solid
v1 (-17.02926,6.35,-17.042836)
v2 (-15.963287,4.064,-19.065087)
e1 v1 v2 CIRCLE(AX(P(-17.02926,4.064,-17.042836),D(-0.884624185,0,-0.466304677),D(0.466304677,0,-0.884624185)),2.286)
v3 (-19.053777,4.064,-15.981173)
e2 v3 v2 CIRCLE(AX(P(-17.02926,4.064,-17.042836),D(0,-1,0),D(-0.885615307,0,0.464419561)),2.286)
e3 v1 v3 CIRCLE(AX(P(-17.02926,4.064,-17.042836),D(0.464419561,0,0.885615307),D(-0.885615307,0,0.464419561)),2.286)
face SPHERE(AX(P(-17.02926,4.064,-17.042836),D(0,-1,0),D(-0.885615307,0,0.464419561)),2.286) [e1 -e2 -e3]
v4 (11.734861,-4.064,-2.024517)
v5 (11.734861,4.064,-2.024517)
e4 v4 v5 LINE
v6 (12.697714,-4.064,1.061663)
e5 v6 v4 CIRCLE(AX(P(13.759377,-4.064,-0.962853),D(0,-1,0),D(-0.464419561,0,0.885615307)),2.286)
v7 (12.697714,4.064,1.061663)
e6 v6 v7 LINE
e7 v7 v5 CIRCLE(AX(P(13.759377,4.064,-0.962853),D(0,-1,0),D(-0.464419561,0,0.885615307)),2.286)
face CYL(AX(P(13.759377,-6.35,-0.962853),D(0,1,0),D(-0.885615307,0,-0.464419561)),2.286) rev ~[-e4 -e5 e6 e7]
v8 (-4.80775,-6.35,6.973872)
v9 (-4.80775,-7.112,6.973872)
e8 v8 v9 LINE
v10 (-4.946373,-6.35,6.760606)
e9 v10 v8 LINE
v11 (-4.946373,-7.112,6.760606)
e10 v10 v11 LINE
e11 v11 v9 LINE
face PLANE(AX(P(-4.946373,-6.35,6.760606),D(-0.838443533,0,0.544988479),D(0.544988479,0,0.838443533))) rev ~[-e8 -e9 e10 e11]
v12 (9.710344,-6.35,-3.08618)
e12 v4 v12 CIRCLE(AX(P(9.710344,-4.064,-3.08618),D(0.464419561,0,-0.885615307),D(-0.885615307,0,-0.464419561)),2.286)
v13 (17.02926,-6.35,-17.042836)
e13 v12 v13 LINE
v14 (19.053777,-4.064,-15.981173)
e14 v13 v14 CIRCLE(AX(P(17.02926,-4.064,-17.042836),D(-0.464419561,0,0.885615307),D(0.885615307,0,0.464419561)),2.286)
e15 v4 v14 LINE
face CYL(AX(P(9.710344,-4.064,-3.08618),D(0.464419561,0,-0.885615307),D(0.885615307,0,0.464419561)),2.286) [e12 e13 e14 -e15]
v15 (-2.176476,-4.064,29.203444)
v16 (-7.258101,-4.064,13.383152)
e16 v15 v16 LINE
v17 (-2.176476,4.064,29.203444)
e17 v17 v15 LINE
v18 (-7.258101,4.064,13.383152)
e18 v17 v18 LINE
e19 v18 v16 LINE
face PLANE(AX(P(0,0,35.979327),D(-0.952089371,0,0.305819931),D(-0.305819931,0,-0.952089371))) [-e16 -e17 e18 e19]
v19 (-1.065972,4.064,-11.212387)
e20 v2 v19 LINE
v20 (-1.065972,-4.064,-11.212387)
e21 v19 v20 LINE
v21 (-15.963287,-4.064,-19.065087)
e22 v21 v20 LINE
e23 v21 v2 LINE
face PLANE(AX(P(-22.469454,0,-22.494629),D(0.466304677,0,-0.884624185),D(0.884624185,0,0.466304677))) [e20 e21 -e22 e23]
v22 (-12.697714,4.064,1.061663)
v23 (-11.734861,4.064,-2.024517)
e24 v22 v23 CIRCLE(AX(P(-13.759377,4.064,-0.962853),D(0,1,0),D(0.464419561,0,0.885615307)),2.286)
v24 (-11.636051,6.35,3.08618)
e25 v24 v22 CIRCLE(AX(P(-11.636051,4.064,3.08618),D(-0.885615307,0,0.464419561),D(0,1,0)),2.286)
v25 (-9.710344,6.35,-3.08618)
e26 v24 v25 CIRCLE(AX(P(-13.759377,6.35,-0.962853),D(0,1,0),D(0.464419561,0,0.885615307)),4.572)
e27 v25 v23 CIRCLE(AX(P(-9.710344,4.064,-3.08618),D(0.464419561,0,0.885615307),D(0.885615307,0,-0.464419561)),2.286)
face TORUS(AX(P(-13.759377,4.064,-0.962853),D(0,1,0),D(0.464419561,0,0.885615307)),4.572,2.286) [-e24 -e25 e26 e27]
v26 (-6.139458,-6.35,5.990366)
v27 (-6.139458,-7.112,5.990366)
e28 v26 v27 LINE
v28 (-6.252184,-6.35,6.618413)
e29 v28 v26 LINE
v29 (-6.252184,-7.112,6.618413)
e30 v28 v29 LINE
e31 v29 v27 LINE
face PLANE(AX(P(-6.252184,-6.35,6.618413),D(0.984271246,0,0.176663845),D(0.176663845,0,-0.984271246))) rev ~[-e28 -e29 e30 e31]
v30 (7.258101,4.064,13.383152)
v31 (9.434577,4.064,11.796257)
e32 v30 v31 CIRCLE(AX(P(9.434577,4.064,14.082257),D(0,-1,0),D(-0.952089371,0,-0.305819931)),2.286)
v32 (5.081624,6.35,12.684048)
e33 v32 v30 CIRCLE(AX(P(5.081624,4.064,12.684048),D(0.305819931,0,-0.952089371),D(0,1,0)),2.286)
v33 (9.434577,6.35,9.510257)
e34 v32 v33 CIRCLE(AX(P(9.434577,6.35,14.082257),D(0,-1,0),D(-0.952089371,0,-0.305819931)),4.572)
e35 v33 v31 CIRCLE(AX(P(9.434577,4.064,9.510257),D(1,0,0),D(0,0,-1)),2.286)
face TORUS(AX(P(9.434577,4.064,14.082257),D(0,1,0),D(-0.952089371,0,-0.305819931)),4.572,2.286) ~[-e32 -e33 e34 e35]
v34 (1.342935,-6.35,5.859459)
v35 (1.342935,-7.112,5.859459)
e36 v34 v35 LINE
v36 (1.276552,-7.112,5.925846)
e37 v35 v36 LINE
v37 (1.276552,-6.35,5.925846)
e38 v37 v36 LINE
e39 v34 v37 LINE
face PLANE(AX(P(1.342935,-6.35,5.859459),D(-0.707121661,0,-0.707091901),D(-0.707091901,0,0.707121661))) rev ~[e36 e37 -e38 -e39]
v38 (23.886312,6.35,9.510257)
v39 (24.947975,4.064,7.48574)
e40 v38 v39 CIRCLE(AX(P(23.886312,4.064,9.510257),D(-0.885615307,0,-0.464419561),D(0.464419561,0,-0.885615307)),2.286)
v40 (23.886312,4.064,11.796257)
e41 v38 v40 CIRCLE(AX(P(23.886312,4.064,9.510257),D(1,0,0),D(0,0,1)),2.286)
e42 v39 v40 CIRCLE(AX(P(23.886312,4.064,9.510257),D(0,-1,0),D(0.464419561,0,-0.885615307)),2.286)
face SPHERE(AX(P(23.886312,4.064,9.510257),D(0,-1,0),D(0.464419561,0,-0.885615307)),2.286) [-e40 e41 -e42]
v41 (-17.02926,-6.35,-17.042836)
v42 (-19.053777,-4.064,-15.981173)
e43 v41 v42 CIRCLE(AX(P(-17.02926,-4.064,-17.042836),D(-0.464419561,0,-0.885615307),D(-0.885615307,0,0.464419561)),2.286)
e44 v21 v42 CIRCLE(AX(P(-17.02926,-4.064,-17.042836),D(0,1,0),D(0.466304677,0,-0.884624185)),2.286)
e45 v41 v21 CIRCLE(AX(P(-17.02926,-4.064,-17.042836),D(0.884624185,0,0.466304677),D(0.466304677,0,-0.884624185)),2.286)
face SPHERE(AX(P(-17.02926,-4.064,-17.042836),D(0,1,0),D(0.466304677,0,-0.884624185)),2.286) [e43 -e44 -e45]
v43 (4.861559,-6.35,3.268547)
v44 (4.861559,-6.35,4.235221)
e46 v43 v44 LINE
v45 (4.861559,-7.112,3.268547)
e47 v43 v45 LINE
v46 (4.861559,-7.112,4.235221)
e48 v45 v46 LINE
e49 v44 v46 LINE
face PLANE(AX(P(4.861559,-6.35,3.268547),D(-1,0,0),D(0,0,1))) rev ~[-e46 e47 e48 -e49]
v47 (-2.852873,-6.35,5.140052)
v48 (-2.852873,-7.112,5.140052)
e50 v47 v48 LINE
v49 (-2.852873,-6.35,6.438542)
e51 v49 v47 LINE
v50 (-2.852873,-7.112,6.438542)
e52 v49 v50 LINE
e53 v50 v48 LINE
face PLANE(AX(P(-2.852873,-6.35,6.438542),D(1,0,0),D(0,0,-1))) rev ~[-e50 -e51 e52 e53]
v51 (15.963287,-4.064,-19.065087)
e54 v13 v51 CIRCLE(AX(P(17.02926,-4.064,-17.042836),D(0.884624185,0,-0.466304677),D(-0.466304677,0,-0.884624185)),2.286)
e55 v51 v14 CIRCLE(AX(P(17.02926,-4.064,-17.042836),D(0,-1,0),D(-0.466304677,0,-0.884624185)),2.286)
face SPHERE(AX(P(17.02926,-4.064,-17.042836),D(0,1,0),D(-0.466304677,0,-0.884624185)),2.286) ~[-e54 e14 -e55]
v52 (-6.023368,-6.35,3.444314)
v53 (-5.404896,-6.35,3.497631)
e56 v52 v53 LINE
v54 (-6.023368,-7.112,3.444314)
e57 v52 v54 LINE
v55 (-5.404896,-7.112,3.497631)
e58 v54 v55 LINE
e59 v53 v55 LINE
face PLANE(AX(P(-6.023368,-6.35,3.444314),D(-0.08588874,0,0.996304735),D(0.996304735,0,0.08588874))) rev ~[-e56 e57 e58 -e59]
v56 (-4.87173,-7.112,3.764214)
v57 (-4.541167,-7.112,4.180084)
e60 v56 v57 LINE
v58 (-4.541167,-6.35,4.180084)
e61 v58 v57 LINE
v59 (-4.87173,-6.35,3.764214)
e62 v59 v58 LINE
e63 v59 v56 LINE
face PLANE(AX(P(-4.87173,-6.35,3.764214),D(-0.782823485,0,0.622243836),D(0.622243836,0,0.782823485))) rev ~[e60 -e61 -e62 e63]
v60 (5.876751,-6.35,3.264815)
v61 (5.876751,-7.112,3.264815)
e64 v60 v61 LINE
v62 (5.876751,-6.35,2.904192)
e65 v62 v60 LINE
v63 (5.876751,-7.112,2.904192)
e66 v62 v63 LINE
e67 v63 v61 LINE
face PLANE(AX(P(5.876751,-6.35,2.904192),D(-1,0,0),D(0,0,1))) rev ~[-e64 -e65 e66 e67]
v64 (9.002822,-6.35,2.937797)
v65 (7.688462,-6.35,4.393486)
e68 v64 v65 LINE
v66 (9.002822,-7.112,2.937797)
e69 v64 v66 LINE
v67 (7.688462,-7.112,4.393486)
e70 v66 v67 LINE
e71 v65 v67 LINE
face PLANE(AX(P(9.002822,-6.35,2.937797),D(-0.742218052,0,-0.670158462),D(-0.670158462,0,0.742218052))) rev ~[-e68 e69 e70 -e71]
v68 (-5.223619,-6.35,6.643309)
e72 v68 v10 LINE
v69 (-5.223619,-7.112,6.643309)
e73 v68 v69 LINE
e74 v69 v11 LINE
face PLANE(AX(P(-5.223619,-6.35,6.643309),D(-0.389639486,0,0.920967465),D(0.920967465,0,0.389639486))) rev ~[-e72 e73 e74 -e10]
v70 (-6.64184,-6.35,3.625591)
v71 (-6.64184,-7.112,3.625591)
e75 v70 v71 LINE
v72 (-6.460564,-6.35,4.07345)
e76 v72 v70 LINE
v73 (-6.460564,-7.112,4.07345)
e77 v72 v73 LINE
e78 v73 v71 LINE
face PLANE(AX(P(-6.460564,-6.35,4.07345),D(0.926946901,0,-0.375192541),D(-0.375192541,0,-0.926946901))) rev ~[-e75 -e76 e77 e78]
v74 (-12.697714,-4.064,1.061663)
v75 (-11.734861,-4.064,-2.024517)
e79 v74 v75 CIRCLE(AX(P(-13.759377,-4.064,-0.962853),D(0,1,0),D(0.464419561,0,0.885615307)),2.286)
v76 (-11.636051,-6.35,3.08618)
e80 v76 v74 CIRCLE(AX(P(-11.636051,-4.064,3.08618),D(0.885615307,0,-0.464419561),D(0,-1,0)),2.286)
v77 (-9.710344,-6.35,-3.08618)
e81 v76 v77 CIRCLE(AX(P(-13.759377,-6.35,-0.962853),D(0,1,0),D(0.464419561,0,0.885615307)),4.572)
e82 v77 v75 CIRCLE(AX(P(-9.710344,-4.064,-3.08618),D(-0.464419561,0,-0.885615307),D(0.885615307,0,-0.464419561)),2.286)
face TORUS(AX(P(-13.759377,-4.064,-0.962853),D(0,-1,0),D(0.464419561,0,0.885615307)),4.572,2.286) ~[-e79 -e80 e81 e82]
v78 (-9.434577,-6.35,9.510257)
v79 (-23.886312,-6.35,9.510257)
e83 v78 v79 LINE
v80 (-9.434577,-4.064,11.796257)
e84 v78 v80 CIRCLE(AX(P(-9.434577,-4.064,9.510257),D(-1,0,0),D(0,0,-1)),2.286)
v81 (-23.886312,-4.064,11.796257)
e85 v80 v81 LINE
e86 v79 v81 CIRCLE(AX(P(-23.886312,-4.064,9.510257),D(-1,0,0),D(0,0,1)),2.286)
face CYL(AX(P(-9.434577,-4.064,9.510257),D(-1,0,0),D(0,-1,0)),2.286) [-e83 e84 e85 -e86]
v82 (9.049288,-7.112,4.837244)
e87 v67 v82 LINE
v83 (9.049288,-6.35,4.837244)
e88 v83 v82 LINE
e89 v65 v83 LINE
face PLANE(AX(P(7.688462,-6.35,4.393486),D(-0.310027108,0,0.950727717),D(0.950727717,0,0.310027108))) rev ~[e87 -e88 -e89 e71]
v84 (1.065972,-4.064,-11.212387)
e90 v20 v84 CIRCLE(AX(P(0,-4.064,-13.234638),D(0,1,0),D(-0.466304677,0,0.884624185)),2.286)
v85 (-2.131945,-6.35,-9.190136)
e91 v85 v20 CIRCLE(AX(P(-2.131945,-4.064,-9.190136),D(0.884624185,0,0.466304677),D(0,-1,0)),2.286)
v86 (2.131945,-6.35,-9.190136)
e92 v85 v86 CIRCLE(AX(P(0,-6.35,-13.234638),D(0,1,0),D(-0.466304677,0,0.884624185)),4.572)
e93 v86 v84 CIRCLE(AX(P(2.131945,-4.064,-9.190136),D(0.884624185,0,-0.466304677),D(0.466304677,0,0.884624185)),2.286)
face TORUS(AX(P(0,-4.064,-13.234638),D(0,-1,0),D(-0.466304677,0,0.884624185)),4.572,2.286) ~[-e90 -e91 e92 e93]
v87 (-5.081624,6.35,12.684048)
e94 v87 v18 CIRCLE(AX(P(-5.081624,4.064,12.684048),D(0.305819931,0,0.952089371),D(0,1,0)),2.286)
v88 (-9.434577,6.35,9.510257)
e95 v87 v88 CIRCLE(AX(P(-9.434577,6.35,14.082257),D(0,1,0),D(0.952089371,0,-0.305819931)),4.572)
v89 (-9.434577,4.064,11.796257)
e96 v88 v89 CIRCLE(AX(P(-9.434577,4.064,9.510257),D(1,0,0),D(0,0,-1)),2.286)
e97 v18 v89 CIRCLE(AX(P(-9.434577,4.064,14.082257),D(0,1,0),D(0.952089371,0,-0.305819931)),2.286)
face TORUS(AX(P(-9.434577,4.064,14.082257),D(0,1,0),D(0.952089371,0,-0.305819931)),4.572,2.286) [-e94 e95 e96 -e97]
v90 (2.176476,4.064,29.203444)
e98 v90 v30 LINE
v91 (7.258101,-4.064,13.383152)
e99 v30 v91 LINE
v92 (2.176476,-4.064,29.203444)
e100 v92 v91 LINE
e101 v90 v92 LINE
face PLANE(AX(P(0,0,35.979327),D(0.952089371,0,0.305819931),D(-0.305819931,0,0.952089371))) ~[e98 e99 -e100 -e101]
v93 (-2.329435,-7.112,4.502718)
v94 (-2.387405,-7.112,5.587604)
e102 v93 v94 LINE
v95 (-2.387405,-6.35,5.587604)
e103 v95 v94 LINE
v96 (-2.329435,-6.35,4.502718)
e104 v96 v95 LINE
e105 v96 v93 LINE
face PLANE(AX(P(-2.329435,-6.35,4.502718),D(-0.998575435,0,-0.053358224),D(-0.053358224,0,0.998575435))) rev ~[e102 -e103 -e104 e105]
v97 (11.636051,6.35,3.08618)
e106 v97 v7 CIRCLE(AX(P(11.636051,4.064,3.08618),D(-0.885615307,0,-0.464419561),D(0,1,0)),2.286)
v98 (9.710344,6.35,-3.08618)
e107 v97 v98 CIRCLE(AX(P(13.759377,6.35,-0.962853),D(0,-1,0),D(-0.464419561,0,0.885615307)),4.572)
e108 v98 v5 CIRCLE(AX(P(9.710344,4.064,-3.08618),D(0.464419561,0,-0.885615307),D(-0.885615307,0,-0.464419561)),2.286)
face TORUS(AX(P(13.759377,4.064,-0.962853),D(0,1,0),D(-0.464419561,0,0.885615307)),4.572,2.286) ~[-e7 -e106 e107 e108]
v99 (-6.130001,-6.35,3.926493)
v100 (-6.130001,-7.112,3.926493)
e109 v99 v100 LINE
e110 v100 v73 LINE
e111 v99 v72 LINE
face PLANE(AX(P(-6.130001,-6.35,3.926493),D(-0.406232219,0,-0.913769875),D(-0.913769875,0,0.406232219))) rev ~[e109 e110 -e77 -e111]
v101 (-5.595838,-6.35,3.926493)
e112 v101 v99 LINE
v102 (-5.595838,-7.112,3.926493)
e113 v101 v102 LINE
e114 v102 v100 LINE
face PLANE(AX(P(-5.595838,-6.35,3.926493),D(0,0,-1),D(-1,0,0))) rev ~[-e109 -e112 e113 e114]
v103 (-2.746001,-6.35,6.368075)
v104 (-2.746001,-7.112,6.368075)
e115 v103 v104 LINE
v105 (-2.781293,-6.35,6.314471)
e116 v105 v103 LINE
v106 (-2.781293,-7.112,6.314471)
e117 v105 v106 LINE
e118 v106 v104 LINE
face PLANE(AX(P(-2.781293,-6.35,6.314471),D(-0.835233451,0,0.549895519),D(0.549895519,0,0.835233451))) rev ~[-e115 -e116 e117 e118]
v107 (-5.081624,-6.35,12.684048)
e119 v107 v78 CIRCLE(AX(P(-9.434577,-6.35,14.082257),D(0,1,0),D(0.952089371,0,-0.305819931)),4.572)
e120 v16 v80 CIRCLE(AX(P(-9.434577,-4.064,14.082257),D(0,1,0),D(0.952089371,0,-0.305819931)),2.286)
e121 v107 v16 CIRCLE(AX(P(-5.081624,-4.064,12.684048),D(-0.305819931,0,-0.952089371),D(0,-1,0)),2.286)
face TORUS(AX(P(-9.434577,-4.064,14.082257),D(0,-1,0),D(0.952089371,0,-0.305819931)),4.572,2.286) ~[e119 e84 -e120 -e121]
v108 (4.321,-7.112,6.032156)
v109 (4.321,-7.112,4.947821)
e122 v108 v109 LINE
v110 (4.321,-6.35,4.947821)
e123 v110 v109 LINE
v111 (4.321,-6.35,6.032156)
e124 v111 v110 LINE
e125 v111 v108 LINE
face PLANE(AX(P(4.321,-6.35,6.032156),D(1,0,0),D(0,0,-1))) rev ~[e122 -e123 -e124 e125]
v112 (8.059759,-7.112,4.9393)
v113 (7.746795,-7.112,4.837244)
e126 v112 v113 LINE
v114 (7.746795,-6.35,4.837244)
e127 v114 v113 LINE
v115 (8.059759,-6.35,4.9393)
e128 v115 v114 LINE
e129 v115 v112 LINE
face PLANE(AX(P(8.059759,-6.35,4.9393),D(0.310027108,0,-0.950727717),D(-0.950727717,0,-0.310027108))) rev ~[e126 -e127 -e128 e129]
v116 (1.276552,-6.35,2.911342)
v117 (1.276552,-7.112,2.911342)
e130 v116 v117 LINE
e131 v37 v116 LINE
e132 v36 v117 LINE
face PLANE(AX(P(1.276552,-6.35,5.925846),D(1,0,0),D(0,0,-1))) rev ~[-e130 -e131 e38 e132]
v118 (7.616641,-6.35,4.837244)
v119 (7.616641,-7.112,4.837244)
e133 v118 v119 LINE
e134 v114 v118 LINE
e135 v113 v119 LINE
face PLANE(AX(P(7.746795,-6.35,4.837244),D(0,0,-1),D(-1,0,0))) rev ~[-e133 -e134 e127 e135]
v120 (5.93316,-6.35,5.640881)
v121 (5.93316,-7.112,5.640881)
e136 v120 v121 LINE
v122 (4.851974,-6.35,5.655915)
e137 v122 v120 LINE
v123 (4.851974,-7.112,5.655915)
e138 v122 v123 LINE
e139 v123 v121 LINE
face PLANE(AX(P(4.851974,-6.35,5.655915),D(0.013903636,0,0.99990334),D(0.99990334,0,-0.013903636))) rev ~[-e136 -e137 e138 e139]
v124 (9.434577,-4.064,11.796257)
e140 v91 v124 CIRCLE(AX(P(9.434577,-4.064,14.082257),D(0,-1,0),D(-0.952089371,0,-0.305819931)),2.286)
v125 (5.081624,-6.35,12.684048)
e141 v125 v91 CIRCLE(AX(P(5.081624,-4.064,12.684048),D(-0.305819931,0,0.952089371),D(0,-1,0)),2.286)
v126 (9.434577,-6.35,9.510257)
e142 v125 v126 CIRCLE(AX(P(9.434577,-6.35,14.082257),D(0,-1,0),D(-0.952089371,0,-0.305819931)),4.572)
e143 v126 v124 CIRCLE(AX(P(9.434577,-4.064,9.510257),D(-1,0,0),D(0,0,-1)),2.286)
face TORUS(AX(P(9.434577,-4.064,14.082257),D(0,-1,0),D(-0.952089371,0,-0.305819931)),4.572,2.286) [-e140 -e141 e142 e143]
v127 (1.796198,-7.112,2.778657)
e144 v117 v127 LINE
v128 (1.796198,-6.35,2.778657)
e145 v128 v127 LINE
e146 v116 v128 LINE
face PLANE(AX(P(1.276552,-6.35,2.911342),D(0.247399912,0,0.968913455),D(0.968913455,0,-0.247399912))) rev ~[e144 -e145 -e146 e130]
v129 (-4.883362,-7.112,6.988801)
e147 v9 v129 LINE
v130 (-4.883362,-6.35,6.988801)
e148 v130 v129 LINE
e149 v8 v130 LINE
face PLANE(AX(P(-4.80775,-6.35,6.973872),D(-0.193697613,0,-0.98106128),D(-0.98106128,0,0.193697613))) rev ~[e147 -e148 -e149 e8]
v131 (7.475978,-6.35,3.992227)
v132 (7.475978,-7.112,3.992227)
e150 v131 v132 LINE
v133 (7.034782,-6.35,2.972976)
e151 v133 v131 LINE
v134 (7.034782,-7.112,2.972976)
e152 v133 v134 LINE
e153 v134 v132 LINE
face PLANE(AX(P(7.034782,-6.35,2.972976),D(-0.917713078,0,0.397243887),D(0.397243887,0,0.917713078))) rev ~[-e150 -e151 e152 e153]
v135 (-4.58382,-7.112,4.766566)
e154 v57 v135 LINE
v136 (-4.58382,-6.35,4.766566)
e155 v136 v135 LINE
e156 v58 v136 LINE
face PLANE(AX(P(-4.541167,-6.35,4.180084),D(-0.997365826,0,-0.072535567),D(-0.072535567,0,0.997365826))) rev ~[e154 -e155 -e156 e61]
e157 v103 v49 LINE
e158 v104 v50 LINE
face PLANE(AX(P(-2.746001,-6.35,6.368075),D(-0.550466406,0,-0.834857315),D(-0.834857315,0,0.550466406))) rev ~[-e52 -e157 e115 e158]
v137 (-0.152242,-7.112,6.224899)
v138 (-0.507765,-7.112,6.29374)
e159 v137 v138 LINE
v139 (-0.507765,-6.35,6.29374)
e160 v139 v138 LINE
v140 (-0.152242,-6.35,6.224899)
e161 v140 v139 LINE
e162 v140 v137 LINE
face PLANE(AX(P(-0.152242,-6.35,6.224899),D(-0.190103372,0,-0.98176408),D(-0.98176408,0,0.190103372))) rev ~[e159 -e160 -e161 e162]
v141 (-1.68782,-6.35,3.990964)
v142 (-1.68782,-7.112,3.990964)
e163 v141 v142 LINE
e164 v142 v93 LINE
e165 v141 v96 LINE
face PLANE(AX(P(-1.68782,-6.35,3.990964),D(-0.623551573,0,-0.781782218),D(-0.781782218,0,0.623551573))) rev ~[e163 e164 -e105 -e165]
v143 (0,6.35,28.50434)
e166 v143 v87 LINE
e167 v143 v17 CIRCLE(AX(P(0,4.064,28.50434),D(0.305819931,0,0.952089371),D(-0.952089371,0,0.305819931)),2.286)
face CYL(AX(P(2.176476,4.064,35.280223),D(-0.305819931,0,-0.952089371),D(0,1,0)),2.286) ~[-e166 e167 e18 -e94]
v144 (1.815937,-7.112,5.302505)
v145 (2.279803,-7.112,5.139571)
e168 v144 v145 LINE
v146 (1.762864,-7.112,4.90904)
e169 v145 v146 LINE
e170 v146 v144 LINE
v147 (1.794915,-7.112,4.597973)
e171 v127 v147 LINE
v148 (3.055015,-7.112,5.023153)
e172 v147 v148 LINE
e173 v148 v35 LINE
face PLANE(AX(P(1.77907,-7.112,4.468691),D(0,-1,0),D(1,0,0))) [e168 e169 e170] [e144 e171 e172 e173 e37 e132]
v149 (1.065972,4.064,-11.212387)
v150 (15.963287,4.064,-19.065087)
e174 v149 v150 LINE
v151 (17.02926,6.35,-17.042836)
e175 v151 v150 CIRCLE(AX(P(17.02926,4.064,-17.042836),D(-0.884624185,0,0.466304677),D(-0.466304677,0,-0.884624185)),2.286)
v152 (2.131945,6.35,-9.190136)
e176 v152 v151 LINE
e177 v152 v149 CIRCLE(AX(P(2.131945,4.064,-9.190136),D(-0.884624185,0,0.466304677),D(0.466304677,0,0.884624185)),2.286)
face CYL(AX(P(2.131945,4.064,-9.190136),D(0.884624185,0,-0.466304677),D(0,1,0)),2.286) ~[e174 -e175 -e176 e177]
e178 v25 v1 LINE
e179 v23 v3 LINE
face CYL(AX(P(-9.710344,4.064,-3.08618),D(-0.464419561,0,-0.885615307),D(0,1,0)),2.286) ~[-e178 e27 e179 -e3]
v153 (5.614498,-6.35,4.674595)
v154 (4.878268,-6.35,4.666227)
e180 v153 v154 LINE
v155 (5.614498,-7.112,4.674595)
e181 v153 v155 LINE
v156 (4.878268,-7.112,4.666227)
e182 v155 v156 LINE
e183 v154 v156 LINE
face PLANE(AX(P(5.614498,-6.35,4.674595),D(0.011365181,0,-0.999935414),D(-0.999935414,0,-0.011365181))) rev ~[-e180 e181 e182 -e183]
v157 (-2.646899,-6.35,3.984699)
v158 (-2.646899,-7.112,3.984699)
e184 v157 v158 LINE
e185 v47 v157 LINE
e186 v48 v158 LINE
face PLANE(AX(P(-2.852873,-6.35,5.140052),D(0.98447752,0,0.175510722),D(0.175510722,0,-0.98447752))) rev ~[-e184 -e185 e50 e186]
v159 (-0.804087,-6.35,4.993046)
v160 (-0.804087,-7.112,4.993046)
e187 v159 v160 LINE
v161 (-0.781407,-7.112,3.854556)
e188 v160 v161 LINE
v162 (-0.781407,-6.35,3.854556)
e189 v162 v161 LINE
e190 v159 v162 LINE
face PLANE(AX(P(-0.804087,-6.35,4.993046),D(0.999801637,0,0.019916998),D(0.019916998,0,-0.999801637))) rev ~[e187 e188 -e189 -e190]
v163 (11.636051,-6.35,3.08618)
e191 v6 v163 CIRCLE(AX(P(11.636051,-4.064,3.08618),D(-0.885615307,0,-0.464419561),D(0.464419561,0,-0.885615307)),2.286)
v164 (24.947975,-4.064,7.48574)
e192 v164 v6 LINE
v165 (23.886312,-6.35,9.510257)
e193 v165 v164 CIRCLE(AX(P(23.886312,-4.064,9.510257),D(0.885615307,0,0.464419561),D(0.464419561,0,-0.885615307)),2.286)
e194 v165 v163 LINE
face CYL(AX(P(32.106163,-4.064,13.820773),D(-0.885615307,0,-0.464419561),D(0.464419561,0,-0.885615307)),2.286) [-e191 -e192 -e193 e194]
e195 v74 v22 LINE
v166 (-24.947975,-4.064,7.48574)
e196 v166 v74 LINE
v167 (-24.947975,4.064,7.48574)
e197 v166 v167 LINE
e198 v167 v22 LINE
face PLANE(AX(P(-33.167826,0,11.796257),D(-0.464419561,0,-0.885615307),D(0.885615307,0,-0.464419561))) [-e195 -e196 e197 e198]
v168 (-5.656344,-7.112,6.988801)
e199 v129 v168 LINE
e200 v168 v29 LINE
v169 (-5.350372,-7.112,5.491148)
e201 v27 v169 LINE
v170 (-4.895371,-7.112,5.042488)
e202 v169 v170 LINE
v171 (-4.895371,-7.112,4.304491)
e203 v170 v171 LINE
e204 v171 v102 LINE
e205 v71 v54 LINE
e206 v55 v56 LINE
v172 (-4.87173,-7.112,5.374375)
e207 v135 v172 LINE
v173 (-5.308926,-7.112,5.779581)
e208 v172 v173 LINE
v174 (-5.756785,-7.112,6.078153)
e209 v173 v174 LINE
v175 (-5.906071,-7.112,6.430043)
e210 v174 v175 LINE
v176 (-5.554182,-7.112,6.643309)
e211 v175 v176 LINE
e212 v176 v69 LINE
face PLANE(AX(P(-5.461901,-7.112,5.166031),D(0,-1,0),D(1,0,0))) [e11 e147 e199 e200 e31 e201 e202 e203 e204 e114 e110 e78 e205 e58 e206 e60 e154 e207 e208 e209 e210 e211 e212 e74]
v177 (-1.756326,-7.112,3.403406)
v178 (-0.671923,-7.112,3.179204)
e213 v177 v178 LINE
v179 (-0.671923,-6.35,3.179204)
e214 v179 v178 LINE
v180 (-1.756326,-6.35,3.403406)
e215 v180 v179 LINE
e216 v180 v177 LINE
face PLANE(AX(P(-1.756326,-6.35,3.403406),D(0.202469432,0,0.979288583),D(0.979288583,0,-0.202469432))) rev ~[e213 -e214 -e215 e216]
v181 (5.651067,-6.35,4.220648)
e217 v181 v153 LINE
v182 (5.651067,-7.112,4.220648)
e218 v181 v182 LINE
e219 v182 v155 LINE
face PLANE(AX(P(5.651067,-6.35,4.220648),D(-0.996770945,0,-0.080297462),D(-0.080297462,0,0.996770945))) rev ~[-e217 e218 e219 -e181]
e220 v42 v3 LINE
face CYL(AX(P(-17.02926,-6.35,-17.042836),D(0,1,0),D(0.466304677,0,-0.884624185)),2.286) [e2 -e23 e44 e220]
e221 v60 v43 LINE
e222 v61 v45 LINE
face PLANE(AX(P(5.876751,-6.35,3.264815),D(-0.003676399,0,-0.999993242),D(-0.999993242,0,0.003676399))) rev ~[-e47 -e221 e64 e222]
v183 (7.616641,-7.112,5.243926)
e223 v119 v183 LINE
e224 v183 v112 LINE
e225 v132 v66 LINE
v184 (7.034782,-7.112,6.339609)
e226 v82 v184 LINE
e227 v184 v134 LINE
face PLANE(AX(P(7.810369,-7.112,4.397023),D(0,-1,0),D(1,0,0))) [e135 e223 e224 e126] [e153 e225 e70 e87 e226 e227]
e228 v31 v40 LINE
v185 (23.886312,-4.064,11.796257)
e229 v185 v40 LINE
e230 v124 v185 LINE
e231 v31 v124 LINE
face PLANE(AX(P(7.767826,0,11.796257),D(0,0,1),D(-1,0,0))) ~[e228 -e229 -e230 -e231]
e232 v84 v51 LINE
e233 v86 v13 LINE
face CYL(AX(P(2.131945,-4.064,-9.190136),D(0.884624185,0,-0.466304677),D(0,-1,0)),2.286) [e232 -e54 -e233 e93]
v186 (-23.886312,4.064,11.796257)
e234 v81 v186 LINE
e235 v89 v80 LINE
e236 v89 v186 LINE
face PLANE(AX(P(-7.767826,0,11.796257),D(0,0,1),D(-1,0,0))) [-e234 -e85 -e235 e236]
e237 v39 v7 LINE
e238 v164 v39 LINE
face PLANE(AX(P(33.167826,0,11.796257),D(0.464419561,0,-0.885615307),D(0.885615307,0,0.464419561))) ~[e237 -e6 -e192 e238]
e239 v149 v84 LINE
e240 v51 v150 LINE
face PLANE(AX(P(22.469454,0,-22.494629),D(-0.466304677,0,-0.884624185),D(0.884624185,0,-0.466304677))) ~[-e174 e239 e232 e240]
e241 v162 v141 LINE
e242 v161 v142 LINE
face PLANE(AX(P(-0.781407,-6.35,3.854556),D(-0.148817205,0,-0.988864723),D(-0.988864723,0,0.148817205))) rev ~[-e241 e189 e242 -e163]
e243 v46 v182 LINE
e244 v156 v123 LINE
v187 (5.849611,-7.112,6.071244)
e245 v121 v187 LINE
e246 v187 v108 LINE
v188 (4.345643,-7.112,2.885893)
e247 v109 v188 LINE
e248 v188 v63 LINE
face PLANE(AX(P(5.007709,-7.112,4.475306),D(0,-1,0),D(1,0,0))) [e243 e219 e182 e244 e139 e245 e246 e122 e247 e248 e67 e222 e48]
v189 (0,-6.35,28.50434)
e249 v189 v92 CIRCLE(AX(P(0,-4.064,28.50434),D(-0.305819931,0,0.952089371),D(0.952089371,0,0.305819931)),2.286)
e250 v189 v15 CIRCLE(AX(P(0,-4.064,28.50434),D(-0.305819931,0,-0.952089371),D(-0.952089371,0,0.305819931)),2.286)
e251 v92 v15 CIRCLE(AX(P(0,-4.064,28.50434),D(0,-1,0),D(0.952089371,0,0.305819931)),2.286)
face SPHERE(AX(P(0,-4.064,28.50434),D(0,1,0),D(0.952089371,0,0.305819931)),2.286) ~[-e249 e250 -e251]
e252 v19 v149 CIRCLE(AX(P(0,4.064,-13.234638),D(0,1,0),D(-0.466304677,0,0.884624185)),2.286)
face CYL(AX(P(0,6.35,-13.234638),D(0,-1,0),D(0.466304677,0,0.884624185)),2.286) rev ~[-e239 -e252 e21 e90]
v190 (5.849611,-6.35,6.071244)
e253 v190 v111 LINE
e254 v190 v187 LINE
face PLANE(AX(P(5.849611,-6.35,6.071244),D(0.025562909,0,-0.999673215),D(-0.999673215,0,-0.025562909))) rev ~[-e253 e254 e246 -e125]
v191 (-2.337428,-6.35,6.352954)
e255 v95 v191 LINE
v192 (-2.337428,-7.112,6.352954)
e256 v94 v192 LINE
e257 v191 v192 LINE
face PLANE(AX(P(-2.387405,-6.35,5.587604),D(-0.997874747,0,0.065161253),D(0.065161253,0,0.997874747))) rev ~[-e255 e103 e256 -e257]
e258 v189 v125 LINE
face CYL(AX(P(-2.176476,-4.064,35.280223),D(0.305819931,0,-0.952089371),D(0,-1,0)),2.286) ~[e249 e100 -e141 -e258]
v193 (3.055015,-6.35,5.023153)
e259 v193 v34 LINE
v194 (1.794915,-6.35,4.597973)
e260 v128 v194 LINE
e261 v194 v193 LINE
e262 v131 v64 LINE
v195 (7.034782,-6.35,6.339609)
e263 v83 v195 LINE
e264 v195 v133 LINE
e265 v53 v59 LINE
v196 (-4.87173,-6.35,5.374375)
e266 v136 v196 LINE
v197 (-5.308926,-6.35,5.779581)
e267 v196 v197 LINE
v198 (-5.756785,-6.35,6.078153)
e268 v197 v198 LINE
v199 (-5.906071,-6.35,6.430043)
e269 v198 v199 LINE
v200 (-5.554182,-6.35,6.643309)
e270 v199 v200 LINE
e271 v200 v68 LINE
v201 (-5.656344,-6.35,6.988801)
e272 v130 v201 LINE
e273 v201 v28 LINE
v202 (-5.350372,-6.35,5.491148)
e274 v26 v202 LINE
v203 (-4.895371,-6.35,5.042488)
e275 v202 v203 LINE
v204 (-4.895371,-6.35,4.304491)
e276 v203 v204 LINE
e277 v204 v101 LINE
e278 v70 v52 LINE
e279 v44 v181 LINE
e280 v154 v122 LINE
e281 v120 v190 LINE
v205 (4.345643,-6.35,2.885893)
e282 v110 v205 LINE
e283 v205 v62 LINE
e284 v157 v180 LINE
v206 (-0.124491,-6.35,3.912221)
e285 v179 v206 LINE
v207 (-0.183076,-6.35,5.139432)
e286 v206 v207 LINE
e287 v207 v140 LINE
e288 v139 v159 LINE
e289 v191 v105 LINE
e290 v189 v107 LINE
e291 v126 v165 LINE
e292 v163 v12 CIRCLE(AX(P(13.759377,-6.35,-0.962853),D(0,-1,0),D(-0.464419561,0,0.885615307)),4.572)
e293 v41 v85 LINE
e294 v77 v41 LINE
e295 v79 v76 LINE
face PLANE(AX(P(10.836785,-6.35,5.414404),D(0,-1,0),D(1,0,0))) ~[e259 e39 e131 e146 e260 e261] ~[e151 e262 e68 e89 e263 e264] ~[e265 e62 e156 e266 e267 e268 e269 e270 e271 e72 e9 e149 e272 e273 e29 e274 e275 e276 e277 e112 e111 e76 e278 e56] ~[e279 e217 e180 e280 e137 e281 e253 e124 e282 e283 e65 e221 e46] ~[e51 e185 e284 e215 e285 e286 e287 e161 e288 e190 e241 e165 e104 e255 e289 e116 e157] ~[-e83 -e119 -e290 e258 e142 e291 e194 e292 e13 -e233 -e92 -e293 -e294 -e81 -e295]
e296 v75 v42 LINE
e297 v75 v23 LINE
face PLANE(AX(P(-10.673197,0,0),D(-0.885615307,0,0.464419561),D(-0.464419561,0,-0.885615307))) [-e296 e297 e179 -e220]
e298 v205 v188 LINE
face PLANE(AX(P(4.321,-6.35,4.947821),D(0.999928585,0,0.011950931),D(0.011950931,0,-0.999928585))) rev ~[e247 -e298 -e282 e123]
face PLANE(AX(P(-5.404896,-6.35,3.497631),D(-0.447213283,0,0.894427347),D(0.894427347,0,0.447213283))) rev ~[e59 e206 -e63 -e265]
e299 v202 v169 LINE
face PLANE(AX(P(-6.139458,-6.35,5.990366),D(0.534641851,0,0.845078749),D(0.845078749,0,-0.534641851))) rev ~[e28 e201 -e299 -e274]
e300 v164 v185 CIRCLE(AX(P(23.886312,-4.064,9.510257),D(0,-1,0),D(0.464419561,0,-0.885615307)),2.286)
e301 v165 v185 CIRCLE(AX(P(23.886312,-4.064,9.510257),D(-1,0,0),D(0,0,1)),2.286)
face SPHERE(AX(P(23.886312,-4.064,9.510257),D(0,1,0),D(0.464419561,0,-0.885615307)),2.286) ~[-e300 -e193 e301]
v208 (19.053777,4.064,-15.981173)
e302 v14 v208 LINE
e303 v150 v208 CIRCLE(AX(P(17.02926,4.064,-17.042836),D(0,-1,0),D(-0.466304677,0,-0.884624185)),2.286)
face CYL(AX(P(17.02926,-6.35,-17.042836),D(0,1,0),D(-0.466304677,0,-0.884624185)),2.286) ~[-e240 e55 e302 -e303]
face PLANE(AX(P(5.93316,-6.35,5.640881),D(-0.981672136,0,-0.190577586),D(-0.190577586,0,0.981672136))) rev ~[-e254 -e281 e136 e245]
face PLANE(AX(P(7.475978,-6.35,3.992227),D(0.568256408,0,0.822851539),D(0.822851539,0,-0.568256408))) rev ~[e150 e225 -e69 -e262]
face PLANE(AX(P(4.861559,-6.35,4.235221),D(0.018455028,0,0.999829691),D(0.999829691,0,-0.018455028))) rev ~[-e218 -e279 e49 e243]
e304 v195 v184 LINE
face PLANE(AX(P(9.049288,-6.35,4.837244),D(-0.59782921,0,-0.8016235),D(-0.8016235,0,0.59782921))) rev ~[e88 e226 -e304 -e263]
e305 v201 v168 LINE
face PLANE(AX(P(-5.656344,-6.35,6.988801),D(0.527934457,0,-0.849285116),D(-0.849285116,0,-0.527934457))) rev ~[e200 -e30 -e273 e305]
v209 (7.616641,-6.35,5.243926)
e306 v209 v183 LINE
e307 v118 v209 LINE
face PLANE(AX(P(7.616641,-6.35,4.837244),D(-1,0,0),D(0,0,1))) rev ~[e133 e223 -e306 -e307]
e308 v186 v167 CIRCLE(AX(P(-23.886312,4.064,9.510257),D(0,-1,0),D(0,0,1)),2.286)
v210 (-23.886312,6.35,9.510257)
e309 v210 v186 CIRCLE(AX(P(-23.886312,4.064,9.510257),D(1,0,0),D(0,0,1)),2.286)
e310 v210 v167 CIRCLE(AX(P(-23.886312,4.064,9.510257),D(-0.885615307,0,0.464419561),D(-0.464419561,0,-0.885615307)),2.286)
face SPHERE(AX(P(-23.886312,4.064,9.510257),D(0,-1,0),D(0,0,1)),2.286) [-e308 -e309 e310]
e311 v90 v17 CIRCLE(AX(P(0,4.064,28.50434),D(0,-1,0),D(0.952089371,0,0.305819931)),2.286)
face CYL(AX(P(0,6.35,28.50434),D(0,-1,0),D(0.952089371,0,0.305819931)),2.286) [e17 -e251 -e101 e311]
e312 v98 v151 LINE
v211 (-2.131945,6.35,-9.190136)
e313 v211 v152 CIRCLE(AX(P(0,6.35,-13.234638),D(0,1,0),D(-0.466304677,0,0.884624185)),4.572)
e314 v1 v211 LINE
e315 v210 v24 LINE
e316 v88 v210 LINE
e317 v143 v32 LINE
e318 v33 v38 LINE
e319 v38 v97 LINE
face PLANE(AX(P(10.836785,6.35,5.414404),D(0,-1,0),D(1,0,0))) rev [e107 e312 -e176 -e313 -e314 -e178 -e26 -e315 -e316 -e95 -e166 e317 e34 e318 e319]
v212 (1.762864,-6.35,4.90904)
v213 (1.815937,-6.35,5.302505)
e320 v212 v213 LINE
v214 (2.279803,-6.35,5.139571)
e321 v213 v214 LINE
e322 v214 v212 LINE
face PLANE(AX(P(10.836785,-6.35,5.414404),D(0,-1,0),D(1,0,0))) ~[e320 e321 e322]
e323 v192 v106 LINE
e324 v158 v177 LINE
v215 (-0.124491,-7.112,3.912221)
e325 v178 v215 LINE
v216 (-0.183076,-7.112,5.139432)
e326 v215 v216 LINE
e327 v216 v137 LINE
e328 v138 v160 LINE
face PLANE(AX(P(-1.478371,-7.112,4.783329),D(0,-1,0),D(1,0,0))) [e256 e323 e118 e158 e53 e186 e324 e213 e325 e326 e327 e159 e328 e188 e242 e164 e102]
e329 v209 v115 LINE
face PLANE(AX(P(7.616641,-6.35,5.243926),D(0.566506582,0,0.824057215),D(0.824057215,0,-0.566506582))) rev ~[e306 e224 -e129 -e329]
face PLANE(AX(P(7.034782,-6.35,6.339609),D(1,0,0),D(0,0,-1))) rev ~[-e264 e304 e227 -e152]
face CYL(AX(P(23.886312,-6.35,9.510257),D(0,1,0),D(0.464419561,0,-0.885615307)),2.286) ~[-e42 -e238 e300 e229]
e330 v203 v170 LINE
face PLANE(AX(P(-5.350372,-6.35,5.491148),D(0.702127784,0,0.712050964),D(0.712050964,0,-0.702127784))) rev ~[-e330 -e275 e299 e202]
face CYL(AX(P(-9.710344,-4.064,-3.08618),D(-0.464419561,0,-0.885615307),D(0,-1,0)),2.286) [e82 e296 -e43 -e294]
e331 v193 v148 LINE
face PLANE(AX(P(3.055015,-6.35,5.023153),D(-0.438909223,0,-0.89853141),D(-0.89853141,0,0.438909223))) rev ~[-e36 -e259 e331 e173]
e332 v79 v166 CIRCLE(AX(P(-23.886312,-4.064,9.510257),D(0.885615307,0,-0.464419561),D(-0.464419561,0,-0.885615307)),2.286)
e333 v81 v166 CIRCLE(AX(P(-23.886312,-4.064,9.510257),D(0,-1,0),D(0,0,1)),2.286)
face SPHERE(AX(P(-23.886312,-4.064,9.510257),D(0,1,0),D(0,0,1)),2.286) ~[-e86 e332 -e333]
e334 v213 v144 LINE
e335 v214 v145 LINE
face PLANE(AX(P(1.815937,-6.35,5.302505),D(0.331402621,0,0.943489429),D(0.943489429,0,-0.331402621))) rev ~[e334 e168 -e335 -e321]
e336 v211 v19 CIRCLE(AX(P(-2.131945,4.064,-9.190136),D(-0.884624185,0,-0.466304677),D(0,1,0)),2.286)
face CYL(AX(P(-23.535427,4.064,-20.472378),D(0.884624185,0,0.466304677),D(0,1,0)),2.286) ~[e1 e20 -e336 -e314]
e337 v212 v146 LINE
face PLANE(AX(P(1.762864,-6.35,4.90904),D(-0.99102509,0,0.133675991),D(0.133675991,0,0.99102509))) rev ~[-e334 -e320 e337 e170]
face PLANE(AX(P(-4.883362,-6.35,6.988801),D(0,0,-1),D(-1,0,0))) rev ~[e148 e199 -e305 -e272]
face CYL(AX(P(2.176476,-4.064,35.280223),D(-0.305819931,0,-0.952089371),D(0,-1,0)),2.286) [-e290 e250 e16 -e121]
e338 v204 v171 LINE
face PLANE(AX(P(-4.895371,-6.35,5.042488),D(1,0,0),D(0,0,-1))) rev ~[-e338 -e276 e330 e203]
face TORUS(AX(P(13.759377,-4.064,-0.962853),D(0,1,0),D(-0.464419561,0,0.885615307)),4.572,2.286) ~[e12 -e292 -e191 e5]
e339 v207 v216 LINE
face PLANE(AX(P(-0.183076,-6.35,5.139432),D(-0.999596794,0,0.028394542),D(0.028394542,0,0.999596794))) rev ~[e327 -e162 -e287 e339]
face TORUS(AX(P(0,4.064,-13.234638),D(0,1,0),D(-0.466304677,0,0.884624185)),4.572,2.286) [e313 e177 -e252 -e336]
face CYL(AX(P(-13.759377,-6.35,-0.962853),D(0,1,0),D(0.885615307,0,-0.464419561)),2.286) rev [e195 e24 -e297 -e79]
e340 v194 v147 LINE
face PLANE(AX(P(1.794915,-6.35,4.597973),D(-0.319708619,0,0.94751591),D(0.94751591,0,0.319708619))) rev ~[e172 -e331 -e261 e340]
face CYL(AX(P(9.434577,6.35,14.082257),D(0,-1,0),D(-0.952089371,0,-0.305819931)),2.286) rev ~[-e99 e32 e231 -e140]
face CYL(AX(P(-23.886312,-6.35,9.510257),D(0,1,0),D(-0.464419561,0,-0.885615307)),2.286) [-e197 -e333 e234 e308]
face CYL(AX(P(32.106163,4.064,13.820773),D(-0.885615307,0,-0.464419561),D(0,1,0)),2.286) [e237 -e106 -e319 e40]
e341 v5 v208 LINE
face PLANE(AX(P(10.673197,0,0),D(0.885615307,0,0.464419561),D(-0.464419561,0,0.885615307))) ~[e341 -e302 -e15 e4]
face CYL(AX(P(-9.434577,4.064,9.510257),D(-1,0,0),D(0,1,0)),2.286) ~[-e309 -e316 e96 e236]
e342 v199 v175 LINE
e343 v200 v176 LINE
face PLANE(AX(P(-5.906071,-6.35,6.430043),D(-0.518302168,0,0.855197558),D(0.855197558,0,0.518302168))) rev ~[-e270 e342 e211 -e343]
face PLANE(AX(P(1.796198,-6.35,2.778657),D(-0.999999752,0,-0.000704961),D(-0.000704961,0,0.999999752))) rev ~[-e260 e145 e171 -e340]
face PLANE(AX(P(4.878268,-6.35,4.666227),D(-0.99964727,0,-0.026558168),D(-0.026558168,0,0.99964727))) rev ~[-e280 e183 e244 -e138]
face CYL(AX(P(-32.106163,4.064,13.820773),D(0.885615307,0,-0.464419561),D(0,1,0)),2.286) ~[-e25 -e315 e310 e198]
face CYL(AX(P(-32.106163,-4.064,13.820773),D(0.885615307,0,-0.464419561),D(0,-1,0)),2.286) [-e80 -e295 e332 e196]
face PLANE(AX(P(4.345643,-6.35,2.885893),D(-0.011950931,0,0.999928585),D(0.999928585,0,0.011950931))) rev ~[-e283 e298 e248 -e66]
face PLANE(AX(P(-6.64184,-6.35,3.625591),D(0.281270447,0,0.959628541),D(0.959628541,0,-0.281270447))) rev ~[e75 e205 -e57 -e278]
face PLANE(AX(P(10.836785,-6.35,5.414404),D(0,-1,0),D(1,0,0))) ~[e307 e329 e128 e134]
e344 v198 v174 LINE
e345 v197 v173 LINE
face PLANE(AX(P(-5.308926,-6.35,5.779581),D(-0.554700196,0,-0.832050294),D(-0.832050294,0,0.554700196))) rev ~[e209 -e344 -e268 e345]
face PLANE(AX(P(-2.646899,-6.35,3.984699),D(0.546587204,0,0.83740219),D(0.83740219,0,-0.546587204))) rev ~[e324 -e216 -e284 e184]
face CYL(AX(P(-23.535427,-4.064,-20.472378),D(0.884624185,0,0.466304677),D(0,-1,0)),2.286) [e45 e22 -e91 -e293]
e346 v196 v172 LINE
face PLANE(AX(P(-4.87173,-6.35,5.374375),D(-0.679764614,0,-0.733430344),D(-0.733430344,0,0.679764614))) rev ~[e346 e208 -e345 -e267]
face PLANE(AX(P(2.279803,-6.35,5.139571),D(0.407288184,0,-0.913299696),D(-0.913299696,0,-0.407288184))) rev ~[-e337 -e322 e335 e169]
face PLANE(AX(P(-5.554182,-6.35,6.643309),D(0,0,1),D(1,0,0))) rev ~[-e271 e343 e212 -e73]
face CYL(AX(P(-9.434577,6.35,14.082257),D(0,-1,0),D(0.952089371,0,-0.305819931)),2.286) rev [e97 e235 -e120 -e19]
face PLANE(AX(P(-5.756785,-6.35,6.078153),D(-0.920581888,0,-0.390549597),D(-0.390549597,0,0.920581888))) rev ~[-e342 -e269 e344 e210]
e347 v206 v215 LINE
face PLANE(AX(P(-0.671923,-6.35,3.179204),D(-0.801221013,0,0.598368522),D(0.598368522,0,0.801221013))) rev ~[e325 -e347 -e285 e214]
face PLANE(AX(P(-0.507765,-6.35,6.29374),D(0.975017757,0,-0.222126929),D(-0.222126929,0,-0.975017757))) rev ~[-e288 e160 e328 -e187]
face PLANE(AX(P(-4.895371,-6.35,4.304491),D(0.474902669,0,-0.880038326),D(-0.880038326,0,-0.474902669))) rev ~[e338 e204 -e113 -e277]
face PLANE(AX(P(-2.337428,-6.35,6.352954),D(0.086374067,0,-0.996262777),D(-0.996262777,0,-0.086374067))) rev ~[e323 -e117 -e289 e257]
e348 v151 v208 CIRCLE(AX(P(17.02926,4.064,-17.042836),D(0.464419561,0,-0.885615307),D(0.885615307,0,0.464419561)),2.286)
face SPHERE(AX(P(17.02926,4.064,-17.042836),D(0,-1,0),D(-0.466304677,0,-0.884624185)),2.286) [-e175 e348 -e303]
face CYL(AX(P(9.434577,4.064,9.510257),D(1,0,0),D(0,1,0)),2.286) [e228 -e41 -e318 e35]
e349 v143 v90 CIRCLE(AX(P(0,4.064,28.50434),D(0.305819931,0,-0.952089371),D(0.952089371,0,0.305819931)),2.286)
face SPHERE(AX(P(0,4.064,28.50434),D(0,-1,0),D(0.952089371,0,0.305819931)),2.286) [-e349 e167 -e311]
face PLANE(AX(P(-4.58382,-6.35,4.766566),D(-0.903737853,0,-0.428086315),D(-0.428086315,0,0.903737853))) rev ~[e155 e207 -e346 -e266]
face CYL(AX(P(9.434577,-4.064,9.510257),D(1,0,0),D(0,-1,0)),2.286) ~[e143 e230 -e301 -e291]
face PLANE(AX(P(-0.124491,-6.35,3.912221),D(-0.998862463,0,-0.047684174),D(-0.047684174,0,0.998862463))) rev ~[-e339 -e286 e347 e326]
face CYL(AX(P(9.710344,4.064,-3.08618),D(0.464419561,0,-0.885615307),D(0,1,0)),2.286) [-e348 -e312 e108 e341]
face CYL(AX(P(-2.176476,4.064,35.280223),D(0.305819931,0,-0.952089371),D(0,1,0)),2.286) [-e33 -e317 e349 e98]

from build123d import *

# Parameters (mm, degrees)
F2_DEPTH = 6.35
F4_F1_R  = 2.286
F4_F2_R  = 2.286
F9_DEPTH = 0.762
F7_DEPTH = 0.762


with BuildPart() as f2:
    # F1 (on face) → F2 (new body, symmetric)
    with BuildSketch(Plane.XZ):
        Polygon((-22.4694542891, -22.4946287922), (0, -10.6504899906), (0, 35.9793268616), (-7.7678262384, 11.7962568429), (-33.1678262384, 11.7962568429), (-10.6731974462, 0), align=None)
    extrude(amount=F2_DEPTH, both=True)

    # F3: F2 across plane


with BuildPart() as f2_1:
    add(f2.part)
    add(f2.part.mirror(Plane.YZ))

    # F4: fillet of radius 2.286 on 26 edges, made by hand

    # F4_f1
    f4_f1_edges = [f2_1.edges().sort_by_distance(p)[0] for p in [
        (7.7678262384, 0, 11.7962568429),
        (10.6731974462, 0, 0),
        (0, 0, -10.6504899906),
        (-10.6731974462, 0, 0),
        (-7.7678262384, 0, 11.7962568429),
    ]]
    fillet(f4_f1_edges, radius=F4_F1_R)

    # F4_f2
    f4_f2_edges = [f2_1.edges().sort_by_distance(p)[0] for p in [
        (-11.7677133906, -6.35, -16.8535080516),
        (11.7677133906, -6.35, -16.8535080516),
        (17.1021574256, -6.35, -12.2595726917),
        (22.932770138, -6.35, 6.4289599794),
        (21.3012015954, -6.35, 11.7962568429),
        (3.6290503253, -6.35, 24.6812396715),
        (-3.6290503253, -6.35, 24.6812396715),
        (-21.3012015954, -6.35, 11.7962568429),
        (-22.932770138, -6.35, 6.4289599794),
        (-17.1021574256, -6.35, -12.2595726917),
        (0, 0, 35.9793268616),
        (3.6290503253, 6.35, 24.6812396715),
        (21.3012015954, 6.35, 11.7962568429),
        (33.1678262384, 0, 11.7962568429),
        (17.1021574256, 6.35, -12.2595726917),
        (22.4694542891, 0, -22.4946287922),
        (-11.7677133906, 6.35, -16.8535080516),
        (-22.4694542891, 0, -22.4946287922),
        (-22.932770138, 6.35, 6.4289599794),
        (-33.1678262384, 0, 11.7962568429),
        (-21.3012015954, 6.35, 11.7962568429),
        (-8.0877949674, 6.35, 12.2351038213),
        (-11.5771185545, 6.35, -0.2820132537),
        (0, 6.35, -10.948638197),
        (11.5771185545, 6.35, -0.2820132537),
        (8.0877949674, 6.35, 12.2351038213),
        (-11.5771185545, -6.35, -0.2820132537),
        (-8.0877949674, -6.35, 12.2351038213),
        (8.0877949674, -6.35, 12.2351038213),
        (11.5771185545, -6.35, -0.2820132537),
        (0, -6.35, -10.948638197),
    ]]
    fillet(f4_f2_edges, radius=F4_F2_R)

    # F8 (on face) → F9 (join)
    with BuildSketch(Plane.XZ.offset(6.35)):
        Polygon((-4.8077497631, 6.9738719612), (-4.8833619803, 6.9888005964), (-5.6563438848, 6.9888005964), (-6.2521840446, 6.6184131429), (-6.1394576915, 5.9903655201), (-5.3503718227, 5.4911477491), (-4.8953713849, 5.0424882211), (-4.8953713849, 4.3044914491), (-5.5958377197, 3.9264927618), (-6.1300005764, 3.9264927618), (-6.4605637453, 4.0734503418), (-6.6418400966, 3.6255908199), (-6.0233678669, 3.4443144687), (-5.4048956372, 3.4976312891), (-4.8717297614, 3.7642139941), (-4.5411670581, 4.180083517), (-4.583820235, 4.7665657476), (-4.8717297614, 5.3743747994), (-5.3089256398, 5.7795806788), (-5.7567846961, 6.078153383), (-5.9060710482, 6.4300429076), (-5.5541819893, 6.6433092579), (-5.223619286, 6.6433092579), (-4.9463729374, 6.7606056109), align=None)
    extrude(amount=F9_DEPTH)

    # F6 (on face) → F7 (join)
    with BuildSketch(Plane.XZ.offset(6.35)):
        Polygon((-2.7460011188, 6.3680754974), (-2.852873411, 6.4385421574), (-2.852873411, 5.140052177), (-2.6468993165, 3.9846990258), (-1.7563264119, 3.4034063574), (-0.6719225785, 3.1792041846), (-0.124490587, 3.912220709), (-0.1830757828, 5.1394319162), (-0.1522420207, 6.2248986214), (-0.5077649839, 6.2937401235), (-0.8040870307, 4.9930457026), (-0.7814072305, 3.8545557763), (-1.6878197202, 3.9909644984), (-2.3294347338, 4.5027183369), (-2.3874049075, 5.5876043625), (-2.337427577, 6.3529536128), (-2.7812926564, 6.314471364), align=None)
        Polygon((1.3429354876, 5.8594592847), (1.2765517458, 5.9258458205), (1.2765517458, 2.9113423079), (1.7961976118, 2.7786572464), (1.7949150642, 4.5979730785), (3.0550148804, 5.0231530331), align=None)
        Polygon((2.2798031569, 5.1395706832), (1.7628639471, 4.9090404063), (1.8159369938, 5.3025046363), align=None, mode=Mode.SUBTRACT)
        Polygon((5.8496114798, 6.0712443665), (4.3209996074, 6.0321558267), (4.3209996074, 4.947821144), (4.3456433341, 2.8858925216), (5.8767511191, 2.904191992), (5.8767511191, 3.2648150809), (4.8615592532, 3.2685473561), (4.8615592532, 4.235221073), (5.6510670111, 4.220648203), (5.6144981645, 4.6745948493), (4.8782676458, 4.666226916), (4.8519740812, 5.6559145451), (5.933160428, 5.6408806704), align=None)
        Polygon((7.0347818546, 6.3396086916), (7.0347818546, 2.9729763046), (7.4759777635, 3.9922273718), (9.0028224513, 2.937797457), (7.6884618029, 4.3934863061), (9.0492879972, 4.8372442834), align=None)
        Polygon((8.0597589084, 4.9393000391), (7.7467951924, 4.8372442834), (7.6166405343, 4.8372442834), (7.6166405343, 5.243926309), align=None, mode=Mode.SUBTRACT)
    extrude(amount=F7_DEPTH)


solid = f2_1.part
